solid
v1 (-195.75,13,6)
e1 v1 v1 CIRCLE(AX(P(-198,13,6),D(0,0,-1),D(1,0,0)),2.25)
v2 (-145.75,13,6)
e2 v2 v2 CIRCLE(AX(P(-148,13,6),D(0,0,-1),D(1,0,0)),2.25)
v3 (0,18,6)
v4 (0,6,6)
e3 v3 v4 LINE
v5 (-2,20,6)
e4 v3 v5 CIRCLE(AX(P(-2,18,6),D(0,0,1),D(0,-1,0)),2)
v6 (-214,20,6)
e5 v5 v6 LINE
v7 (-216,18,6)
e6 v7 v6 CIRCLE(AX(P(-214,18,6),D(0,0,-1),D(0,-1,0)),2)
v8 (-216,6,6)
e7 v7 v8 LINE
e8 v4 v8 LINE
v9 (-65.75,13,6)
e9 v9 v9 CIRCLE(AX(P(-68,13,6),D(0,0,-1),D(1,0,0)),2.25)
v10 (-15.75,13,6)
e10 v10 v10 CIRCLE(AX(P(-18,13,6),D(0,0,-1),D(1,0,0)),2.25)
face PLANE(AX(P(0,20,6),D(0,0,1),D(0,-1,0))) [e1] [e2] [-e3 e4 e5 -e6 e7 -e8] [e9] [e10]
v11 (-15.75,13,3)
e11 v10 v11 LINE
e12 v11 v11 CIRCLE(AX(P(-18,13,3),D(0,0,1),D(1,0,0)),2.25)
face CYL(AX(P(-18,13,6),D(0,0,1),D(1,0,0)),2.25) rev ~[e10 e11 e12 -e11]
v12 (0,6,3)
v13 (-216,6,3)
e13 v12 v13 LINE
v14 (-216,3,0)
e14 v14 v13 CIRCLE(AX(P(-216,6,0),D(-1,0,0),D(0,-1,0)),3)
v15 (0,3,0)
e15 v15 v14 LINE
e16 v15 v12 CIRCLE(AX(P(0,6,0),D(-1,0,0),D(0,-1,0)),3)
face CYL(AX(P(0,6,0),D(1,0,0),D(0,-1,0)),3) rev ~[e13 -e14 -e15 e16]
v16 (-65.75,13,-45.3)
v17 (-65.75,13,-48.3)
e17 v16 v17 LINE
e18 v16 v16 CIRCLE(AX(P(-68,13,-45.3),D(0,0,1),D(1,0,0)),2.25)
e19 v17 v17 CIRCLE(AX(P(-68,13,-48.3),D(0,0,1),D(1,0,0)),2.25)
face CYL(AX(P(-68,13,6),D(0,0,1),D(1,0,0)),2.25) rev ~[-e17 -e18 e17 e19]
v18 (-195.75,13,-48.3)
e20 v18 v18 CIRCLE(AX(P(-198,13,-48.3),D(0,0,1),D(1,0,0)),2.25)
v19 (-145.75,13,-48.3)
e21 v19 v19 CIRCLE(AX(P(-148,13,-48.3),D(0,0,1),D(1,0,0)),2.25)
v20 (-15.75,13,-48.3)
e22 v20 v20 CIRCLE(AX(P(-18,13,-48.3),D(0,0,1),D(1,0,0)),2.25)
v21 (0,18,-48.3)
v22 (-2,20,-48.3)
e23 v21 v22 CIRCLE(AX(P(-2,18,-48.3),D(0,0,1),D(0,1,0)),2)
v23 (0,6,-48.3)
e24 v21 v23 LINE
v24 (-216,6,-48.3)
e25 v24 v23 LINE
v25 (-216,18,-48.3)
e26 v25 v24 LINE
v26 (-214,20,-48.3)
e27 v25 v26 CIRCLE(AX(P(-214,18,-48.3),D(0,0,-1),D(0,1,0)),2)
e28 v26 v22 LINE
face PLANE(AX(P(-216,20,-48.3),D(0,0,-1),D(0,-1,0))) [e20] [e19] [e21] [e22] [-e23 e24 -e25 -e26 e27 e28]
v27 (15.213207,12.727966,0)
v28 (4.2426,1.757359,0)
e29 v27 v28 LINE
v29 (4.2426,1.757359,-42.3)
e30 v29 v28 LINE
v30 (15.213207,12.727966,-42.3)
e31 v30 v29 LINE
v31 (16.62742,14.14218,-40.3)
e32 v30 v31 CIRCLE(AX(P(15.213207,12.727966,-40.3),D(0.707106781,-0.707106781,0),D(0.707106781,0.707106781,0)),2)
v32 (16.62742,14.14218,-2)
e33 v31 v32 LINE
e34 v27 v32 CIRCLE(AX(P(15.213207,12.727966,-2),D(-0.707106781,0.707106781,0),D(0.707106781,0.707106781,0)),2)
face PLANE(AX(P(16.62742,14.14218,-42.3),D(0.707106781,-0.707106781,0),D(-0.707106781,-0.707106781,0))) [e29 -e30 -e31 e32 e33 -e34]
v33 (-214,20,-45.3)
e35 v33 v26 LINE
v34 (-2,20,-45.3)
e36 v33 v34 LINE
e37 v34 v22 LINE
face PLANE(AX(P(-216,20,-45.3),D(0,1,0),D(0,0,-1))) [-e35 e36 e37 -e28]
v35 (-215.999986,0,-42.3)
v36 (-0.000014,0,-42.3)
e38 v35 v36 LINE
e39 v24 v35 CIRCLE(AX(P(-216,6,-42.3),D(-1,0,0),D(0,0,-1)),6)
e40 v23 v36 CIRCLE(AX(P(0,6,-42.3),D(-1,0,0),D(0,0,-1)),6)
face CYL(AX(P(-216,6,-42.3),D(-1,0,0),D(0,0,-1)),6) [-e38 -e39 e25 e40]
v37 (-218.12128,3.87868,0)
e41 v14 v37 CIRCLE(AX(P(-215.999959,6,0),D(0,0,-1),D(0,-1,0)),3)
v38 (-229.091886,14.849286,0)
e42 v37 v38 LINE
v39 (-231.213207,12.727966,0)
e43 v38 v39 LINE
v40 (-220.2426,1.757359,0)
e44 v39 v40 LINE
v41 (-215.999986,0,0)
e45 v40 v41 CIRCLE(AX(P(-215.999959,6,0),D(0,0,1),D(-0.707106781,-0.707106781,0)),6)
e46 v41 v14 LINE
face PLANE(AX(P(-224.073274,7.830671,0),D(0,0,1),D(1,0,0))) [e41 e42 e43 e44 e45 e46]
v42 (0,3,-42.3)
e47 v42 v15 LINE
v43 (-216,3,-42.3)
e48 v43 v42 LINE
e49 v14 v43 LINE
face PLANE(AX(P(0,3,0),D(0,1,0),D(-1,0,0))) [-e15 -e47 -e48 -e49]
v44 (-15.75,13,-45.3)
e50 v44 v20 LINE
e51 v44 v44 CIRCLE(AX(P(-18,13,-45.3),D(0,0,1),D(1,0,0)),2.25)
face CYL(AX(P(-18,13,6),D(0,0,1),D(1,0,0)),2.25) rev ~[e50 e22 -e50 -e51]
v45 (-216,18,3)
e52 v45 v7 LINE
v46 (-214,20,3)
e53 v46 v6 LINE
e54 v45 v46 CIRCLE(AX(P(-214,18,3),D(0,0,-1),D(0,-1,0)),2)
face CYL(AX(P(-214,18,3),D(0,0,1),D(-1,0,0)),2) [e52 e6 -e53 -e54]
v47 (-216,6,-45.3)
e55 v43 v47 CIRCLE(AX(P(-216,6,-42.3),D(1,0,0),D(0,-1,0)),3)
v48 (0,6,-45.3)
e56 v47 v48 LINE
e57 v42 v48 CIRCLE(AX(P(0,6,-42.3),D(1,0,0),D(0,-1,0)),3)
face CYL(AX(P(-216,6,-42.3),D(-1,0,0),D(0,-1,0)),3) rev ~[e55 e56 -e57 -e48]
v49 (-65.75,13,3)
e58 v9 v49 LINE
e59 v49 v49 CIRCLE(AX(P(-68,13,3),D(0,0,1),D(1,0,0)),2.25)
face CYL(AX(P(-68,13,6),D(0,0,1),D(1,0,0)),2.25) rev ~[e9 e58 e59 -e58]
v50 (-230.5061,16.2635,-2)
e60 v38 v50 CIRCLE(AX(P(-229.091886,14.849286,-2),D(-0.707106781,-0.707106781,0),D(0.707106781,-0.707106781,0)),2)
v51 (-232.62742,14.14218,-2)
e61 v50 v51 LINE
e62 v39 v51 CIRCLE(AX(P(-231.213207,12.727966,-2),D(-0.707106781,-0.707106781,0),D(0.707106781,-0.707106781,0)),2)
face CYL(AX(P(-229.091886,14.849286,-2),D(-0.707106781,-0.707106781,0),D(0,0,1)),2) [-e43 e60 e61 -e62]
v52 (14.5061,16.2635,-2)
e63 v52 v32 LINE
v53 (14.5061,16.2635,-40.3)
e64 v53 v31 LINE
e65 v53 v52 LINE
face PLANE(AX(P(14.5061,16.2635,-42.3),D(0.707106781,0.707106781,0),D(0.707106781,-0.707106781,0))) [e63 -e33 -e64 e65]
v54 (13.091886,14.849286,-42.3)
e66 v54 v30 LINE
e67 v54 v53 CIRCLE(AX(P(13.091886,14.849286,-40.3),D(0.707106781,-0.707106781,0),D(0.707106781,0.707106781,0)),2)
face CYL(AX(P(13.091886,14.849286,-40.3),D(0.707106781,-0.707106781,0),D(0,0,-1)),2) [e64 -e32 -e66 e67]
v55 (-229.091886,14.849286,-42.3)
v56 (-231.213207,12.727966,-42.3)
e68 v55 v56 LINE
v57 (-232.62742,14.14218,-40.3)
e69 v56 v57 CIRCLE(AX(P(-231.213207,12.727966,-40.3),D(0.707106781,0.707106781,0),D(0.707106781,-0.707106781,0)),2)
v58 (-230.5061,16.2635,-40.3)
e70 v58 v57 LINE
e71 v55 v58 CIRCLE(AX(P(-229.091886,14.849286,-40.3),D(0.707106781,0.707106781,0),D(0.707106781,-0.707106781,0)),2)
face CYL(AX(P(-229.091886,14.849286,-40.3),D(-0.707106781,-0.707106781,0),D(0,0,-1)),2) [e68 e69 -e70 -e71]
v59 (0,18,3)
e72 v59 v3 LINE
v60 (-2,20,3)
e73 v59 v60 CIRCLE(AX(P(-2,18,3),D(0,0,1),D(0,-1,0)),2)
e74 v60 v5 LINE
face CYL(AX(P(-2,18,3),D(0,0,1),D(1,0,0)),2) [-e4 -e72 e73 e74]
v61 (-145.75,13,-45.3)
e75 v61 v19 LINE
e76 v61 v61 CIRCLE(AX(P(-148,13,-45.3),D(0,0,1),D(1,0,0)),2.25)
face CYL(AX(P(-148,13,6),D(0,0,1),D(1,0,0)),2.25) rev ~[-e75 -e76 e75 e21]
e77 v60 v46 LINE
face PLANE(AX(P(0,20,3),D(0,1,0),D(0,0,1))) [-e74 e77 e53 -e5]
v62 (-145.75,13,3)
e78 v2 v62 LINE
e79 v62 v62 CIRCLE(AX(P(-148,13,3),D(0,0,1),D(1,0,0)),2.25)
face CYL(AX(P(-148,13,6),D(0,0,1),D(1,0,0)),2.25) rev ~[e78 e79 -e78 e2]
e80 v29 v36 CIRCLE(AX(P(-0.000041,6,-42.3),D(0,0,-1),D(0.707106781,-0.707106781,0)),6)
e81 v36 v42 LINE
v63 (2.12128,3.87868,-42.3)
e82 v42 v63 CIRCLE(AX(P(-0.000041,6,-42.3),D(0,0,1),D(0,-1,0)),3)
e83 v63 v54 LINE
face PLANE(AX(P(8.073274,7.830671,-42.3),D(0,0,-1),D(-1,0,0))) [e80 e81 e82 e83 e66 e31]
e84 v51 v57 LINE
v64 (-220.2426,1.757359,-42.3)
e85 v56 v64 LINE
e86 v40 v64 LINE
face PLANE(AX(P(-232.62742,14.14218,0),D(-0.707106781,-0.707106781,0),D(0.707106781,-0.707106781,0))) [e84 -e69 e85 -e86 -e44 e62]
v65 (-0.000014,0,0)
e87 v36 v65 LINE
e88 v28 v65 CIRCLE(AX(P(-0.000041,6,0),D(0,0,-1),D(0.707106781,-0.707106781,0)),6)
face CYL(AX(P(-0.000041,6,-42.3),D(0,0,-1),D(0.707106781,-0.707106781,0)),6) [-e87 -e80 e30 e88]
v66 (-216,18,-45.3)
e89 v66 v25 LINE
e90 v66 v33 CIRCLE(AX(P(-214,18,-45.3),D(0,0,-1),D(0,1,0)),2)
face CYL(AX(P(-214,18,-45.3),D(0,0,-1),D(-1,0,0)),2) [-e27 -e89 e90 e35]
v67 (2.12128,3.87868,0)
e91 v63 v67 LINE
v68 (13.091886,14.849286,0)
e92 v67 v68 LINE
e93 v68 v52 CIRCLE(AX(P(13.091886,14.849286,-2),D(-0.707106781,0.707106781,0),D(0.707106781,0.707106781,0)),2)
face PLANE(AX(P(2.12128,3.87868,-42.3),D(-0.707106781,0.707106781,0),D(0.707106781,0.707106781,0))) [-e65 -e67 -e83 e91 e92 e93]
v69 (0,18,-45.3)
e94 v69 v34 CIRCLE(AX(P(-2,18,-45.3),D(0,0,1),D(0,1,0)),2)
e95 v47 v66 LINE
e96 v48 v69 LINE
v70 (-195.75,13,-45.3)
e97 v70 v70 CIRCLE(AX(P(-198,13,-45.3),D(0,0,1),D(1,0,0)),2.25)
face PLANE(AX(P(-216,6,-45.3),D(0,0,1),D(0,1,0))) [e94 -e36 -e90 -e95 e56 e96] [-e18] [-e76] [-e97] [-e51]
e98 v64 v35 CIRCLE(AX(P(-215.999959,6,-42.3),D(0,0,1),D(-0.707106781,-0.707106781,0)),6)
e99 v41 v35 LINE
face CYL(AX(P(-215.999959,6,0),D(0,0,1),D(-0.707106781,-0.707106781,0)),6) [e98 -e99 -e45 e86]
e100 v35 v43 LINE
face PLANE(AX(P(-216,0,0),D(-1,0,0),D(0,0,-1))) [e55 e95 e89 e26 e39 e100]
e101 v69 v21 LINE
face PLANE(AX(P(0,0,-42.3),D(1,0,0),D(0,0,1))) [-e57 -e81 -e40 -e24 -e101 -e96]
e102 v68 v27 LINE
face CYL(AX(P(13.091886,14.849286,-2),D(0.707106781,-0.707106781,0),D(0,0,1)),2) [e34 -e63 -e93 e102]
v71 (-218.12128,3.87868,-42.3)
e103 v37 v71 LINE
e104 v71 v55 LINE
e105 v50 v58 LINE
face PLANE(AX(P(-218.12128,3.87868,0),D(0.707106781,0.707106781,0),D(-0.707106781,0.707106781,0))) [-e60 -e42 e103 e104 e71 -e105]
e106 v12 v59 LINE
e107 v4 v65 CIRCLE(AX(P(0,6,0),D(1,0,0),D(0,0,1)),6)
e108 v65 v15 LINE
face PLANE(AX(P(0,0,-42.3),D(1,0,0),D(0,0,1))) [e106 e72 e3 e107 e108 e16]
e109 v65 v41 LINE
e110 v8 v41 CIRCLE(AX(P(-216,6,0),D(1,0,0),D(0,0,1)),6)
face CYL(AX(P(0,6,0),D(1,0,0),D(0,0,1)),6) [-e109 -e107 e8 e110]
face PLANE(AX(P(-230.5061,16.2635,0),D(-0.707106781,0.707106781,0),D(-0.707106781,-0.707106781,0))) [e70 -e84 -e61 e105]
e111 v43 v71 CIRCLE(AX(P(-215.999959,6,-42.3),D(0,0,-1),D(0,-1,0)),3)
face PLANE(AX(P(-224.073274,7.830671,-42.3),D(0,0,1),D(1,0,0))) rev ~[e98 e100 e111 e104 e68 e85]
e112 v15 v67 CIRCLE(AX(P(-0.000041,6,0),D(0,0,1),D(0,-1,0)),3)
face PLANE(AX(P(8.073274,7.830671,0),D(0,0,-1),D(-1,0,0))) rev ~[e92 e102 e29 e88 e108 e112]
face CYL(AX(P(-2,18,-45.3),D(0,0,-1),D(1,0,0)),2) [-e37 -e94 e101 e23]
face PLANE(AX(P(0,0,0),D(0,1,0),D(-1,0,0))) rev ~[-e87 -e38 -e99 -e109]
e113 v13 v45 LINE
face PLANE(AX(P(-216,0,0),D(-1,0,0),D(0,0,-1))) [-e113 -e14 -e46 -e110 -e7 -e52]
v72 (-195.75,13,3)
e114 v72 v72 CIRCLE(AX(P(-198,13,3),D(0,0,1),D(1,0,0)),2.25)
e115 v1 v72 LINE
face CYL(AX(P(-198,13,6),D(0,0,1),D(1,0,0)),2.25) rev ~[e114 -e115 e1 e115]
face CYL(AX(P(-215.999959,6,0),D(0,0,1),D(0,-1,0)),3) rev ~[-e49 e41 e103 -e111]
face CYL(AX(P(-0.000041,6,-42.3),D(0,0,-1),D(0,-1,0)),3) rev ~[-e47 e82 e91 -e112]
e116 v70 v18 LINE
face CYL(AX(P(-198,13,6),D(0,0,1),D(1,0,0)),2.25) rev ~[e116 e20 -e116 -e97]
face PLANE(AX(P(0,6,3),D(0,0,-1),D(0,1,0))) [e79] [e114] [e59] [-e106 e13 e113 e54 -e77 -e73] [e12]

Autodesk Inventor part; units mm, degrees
ref_plane "YZ Plane" through (0, 0, 0) normal (1, 0, 0) x (0, 1, 0)
ref_plane "XZ Plane" through (0, 0, 0) normal (0, 1, 0) x (-1, 0, 0)
ref_plane "XY Plane" through (0, 0, 0) normal (0, 0, 1) x (1, 0, 0)
sketch "Skizze1" plane through (0, 0, 0) normal (0, 1, 0) x (-1, 0, 0)
  line L0 (0, 0) -> (216, 0)
  line L1 (216, 0) -> (216, -42.3)
  line L2 (216, -42.3) -> (0, -42.3)
  line L3 (0, -42.3) -> (0, 0)
  dimension "d0" = 216
  dimension "d1" = 42.3
extrude "Extrusion1" add sketch "Skizze1" along normal blind 3
sketch "Skizze2" plane through (0, 6, 3) normal (0, 0, 1) x (1, 0, 0)
  line L0 (-216, 0) -> (0, 0)
  line L1 (0, 0) -> (0, 14)
  line L2 (0, 14) -> (-216, 14)
  line L3 (-216, 14) -> (-216, 0)
edge flange "Lasche1" height 20 angle 90 thickness 3 bend radius 3 thickness toward (0, 0, 1) relief tear relief width 3 relief depth 1.5 corner gap 3 corner form 0 edges at (-108, 3, 0) (-108, 3, -42.3) wall of the first edge with corners at (-216, 6, 3) (0, 6, 3) (0, 20, 3) (-216, 20, 3)
bend "Biegung1"
corner "Ecke1"
sketch "Skizze3" plane through (-218.1213, 3.8787, 0) normal (-0.7071068, -0.7071068, 0) x (0.7071068, -0.7071068, 0)
  line L0 (0, -42.3) -> (0, 0)
  line L1 (0, 0) -> (-17.5147, 0)
  line L2 (-17.5147, 0) -> (-17.5147, -42.3)
  line L3 (-17.5147, -42.3) -> (0, -42.3)
edge flange "Lasche2" height 20 angle 45 thickness 3 bend radius 3 thickness toward (-0.7071068, -0.7071068, 0) relief tear relief width 3 relief depth 1.5 corner gap 3 corner form 0 edges at (-216, 3, -21.15) (0, 3, -21.15) wall of the first edge with corners at (-218.1213, 3.8787, -42.3) (-218.1213, 3.8787, 0) (-230.5061, 16.2635, 0) (-230.5061, 16.2635, -42.3)
bend "Biegung2"
corner "Ecke2"
sketch "Skizze4" plane through (-216, 20, 6) normal (0, 0, 1) x (1, 0, 0)
  line L0 (0, 0) -> (0, -14) projected
  line L1 (0, -7) -> (216, -7)
  line L2 (216, 0) -> (216, -14) projected
  line L3 (0, 0) -> (216, 0) projected
  line L4 (108, 0) -> (108, -14)
  line L5 (216, -14) -> (0, -14) projected
  circle A0 centre (68, -7) radius 2.25
  circle A1 centre (18, -7) radius 2.25
  circle A2 centre (148, -7) radius 2.25
  circle A3 centre (198, -7) radius 2.25
  point P0 (216, -20)
  dimension "d25" = 4.5
  dimension "d26" = 4.5
  dimension "d27" = 4.5
  dimension "d28" = 4.5
  dimension "d29" = 80
  dimension "d30" = 180
extrude "Extrusion2" cut sketch "Skizze4" against normal blind 100 contours A1 L1 | L1 A1 | A0 L1 | L1 A0 | A2 L1 | L1 A2 | A3 L1 | L1 A3
fillet "Rundung1" radius 2 8 edges at (-231.5668, 15.2028, 0) (-231.5668, 15.2028, -42.3) (-216, 20, -46.8) (-216, 20, 4.5) (0, 20, 4.5) (15.5668, 15.2028, 0) (0, 20, -46.8) (15.5668, 15.2028, -42.3)
equation "\"d4\" = Stärke"
equation "\"d5\" = BreiteBiegungsfreistellung"
equation "\"d6\" = TiefeBiegungsfreistellung"
equation "\"d7\" = MinimalRest"
equation "\"d8\" = Übergangsradius"
equation "\"d11\" = Biegeradius"
equation "\"d12\" = GrößeEckenfreistellung"
equation "\"d13\" = Abstandsgröße"
equation "\"d14\" = JacobiRadiusGröße"
equation "\"d15\" = BreiteBiegungsfreistellung"
equation "\"d16\" = TiefeBiegungsfreistellung"
equation "\"d17\" = MinimalRest"
equation "\"d18\" = Übergangsradius"
equation "\"d21\" = Biegeradius"
equation "\"d22\" = GrößeEckenfreistellung"
equation "\"d23\" = Abstandsgröße"
equation "\"d24\" = JacobiRadiusGröße"
equation "\"Biegeradius\" = Stärke"
equation "\"BreiteBiegungsfreistellung\" = Stärke"
equation "\"TiefeBiegungsfreistellung\" = 0.5 * Stärke"
equation "\"GrößeEckenfreistellung\" = 4 * Stärke"
equation "\"MinimalRest\" = 2 * Stärke"
equation "\"Übergangsradius\" = Biegeradius"
equation "\"JacobiRadiusGröße\" = Biegeradius"
equation "\"Abstandsgröße\" = Stärke"
equation "\"Stärke\" = 3"
properties part number "Stossfänger_04" material "Aluminium 6061"
